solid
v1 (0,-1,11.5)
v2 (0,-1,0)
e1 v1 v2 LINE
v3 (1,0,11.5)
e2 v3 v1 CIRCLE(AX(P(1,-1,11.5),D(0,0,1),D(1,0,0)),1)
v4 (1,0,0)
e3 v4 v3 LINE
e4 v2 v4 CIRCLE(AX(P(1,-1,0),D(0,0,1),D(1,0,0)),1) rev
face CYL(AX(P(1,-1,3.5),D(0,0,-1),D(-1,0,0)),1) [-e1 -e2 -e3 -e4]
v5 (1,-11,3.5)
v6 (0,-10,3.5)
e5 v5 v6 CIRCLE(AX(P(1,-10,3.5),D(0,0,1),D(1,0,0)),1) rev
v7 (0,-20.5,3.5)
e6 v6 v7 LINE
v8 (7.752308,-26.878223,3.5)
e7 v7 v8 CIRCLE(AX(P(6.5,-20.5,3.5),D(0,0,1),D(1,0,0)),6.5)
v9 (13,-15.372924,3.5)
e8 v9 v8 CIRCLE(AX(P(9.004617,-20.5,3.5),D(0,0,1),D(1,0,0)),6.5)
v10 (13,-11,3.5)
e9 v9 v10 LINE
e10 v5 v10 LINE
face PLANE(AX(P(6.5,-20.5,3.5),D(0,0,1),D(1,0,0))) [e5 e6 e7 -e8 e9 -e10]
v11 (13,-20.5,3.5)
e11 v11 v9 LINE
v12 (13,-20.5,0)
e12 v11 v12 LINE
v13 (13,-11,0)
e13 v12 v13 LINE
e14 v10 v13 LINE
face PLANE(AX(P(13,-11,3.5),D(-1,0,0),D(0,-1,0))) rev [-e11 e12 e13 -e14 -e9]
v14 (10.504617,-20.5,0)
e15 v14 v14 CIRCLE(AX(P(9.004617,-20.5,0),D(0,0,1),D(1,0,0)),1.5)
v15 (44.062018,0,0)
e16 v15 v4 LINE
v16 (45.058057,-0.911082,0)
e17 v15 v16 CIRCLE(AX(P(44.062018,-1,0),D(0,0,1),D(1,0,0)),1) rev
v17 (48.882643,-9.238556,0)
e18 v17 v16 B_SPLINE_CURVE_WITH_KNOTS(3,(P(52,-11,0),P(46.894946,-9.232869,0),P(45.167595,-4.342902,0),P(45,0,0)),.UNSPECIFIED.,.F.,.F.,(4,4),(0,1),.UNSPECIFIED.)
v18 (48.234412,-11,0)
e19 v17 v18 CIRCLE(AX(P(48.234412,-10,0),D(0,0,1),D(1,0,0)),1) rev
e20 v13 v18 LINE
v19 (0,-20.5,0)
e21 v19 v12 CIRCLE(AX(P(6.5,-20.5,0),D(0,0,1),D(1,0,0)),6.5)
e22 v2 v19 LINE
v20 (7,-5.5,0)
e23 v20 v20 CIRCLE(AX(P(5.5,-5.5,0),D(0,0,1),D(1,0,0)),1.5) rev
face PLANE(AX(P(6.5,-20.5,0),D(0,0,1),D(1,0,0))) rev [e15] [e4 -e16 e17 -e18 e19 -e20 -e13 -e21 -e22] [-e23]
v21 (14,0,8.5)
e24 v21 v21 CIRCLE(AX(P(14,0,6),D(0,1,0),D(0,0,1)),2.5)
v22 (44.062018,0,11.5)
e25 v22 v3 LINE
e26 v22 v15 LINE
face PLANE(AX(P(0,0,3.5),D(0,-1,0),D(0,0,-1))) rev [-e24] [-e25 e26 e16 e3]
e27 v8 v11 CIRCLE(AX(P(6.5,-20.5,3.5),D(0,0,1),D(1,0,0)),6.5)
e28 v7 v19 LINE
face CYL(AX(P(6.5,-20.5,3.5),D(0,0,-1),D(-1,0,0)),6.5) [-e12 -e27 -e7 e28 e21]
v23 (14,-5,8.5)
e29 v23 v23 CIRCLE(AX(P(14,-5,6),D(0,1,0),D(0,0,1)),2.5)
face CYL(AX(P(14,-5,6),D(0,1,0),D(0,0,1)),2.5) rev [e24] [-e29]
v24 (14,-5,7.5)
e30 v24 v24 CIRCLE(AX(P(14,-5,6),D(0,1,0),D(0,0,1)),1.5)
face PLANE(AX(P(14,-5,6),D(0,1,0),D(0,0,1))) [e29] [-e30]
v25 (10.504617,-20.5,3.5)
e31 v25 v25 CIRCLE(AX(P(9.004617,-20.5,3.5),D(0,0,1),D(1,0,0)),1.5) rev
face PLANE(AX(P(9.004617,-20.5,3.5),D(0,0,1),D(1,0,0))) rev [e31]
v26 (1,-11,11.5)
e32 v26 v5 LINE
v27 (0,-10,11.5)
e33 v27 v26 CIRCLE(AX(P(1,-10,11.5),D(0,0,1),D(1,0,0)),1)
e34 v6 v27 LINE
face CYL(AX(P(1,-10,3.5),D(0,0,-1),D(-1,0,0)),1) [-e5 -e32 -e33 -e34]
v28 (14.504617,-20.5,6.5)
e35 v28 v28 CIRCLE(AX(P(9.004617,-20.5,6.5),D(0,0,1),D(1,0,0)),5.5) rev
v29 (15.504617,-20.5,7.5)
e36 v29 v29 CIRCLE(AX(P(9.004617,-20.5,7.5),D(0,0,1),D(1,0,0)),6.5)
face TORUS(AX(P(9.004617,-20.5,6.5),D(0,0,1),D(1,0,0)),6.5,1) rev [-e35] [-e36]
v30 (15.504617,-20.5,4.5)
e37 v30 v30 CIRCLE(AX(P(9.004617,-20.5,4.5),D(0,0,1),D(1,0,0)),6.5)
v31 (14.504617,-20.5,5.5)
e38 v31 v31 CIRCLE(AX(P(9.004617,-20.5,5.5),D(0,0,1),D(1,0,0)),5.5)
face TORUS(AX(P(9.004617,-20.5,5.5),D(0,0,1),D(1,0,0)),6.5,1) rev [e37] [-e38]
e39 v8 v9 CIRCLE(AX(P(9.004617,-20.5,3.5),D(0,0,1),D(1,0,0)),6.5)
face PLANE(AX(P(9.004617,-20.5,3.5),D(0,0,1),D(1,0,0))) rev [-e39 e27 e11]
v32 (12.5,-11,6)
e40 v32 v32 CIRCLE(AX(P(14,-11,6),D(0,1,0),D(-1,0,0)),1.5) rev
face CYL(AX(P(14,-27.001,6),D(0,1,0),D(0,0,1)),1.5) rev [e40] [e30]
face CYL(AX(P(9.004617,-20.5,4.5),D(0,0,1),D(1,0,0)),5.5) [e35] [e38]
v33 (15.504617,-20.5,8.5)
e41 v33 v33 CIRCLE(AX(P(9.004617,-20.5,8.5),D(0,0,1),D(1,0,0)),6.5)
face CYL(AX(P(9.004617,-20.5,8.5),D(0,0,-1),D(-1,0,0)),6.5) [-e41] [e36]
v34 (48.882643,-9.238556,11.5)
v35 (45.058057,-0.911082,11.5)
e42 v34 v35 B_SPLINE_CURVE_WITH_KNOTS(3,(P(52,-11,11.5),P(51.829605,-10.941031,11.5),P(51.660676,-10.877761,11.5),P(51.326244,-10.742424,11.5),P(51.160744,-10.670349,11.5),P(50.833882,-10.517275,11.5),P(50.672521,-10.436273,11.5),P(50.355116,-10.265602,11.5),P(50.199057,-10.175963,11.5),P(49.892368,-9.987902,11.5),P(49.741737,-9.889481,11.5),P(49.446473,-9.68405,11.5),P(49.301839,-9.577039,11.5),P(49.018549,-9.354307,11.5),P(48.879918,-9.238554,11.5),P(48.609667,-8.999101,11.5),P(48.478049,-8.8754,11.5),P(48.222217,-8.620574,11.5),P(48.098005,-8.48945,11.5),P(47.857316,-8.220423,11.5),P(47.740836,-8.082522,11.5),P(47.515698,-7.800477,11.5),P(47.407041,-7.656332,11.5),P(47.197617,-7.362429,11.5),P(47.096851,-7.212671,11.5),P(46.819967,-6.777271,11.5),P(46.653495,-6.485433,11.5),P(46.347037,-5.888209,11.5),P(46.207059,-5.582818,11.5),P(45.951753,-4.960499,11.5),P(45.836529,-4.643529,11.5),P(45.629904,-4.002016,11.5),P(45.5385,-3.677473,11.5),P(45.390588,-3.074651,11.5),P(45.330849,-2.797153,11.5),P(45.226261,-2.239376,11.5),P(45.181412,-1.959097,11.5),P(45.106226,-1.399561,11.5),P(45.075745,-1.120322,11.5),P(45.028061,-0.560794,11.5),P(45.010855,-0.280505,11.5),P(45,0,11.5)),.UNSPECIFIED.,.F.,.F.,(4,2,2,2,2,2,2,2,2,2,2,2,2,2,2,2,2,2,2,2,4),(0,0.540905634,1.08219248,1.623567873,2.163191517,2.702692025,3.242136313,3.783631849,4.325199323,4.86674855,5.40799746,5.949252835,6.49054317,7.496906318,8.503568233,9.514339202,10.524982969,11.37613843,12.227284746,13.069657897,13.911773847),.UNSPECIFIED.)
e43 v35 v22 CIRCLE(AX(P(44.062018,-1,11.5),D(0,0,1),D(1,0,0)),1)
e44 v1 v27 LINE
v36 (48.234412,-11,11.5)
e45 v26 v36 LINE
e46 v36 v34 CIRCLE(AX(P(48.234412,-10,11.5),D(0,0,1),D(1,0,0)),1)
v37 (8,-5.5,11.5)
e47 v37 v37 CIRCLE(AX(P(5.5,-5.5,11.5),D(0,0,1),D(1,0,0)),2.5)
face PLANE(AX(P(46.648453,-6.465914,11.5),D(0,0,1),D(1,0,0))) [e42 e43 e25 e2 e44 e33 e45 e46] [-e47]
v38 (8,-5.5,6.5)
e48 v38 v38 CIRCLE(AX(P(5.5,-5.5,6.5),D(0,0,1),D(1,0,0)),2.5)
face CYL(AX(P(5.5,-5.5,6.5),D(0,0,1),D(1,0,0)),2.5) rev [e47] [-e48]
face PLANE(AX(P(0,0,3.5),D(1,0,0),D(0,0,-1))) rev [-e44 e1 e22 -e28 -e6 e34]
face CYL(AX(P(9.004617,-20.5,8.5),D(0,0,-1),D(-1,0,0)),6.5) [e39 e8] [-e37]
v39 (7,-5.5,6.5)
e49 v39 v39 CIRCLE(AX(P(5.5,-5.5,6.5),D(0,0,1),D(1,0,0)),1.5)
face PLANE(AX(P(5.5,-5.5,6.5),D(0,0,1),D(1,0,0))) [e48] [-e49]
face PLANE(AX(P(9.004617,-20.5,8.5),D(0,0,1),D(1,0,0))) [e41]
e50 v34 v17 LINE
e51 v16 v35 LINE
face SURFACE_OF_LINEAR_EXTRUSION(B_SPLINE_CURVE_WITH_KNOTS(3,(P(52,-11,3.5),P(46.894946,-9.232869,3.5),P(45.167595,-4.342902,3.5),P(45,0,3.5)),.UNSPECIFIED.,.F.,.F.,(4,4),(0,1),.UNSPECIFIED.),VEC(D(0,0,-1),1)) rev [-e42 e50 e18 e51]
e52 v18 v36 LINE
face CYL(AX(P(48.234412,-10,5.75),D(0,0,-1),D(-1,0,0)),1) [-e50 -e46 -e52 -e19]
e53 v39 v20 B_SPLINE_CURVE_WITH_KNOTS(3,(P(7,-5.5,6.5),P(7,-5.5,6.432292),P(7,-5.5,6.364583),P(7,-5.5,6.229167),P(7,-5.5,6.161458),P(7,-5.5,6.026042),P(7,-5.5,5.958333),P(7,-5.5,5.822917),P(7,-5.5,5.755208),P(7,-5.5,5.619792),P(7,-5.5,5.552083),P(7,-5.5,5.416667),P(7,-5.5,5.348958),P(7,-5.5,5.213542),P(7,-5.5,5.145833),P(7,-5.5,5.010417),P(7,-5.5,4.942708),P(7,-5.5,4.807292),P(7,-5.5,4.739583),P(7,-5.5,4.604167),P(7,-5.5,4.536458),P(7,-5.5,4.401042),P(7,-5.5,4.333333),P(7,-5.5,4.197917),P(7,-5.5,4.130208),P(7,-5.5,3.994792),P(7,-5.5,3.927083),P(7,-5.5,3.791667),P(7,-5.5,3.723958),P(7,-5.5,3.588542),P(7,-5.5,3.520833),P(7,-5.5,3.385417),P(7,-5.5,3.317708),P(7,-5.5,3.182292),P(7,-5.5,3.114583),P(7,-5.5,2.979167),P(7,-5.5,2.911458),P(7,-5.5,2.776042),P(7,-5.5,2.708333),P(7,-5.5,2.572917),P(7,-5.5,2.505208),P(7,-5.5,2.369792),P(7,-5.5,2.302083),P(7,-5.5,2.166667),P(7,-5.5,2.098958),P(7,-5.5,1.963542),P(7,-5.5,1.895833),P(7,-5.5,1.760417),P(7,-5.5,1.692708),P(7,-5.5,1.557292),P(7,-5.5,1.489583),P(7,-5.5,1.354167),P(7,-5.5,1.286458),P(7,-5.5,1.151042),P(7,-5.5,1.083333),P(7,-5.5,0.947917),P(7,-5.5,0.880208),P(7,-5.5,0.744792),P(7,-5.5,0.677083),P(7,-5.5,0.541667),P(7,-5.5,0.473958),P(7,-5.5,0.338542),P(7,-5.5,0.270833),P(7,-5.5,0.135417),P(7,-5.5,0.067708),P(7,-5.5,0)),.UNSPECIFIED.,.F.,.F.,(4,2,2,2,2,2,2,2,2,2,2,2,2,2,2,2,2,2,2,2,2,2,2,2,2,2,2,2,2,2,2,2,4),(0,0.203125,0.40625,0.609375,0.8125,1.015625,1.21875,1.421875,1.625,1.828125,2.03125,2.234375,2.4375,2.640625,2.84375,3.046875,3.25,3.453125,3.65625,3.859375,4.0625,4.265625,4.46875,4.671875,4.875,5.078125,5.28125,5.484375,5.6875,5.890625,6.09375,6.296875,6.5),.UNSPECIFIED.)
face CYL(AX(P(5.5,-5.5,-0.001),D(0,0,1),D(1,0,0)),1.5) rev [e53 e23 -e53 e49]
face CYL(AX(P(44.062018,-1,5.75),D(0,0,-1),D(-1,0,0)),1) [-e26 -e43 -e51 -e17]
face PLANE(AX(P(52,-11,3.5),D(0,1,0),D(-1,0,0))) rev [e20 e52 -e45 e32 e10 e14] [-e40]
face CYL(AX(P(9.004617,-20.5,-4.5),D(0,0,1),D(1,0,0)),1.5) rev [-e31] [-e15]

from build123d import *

# Parameters (mm, degrees)
BOSS_EXTRUDE1_DEPTH = 3.5
BOSS_EXTRUDE2_DEPTH = 8
FILLET1_R           = 1
SKETCH3_R           = 1.5
CUT_EXTRUDE1_DEPTH  = 8
SKETCH4_R           = 2.5
CUT_EXTRUDE2_DEPTH  = 5
CUT_EXTRUDE3_REACH  = 58.527
SKETCH5_R           = 1.5
SKETCH6_R           = 2.5
CUT_EXTRUDE4_DEPTH  = 5
CUT_EXTRUDE5_REACH  = 57.139
SKETCH7_R           = 1.5
SKETCH8_R           = 6.5
BOSS_EXTRUDE3_DEPTH = 5
CUT_EXTRUDE6_START  = -4
SKETCH9_R           = 6.5
SKETCH9_R_2         = 5.5
CUT_EXTRUDE6_DEPTH  = 3
FILLET2_R           = 1


with BuildPart() as part:
    # Sketch1 → Boss-Extrude1 (new body)
    with BuildSketch(Plane.XY):
        with BuildLine():
            Line((0, 0), (45, 0))
            add(Edge.make_bspline(
                [(45, 0), (45.167594828, -4.342902355), (46.894946491, -9.232868563), (52, -11)],
                knots=[0, 0, 0, 0, 1, 1, 1, 1], degree=3))
            Line((52, -11), (13, -11))
            Line((13, -11), (13, -20.5))
            ThreePointArc((13, -20.5), (6.5, -27), (0, -20.5))
            Line((0, -20.5), (0, 0))
        make_face()
    extrude(amount=BOSS_EXTRUDE1_DEPTH)

    # Sketch2 → Boss-Extrude2 (add)
    with BuildSketch(Plane.XY.offset(3.5)):
        with BuildLine():
            Line((0, 0), (0, -11))
            Line((0, -11), (13, -11))
            Line((13, -11), (52, -11))
            add(Edge.make_bspline(
                [(52, -11), (46.894946491, -9.232868563), (45.167594828, -4.342902355), (45, 0)],
                knots=[0, 0, 0, 0, 1, 1, 1, 1], degree=3))
            Line((45, 0), (0, 0))
        make_face()
    extrude(amount=BOSS_EXTRUDE2_DEPTH)

    # Fillet1
    fillet1_edges = [part.edges().sort_by_distance(p)[0] for p in [
        (52, -11, 7.5),
        (45, 0, 7.5),
        (0, 0, 5.75),
        (0, -11, 7.5),
    ]]
    fillet(fillet1_edges, radius=FILLET1_R)

    # Sketch3 → Cut-Extrude1 (cut)
    with BuildSketch(Plane.XY.offset(3.5)):
        with Locations((9.004616649, -20.5)):
            Circle(SKETCH3_R)
    extrude(amount=-CUT_EXTRUDE1_DEPTH, mode=Mode.SUBTRACT)

    # Sketch4 → Cut-Extrude2 (cut)
    with BuildSketch(Plane.XY.offset(11.5)):
        with Locations((5.5, -5.5)):
            Circle(SKETCH4_R)
    extrude(amount=-CUT_EXTRUDE2_DEPTH, mode=Mode.SUBTRACT)

    # Sketch5 → Cut-Extrude3 (cut, up to next)
    with BuildSketch(Plane.XY.offset(6.5), mode=Mode.PRIVATE) as cut_extrude3_sk1:
        with Locations((5.5, -5.5)):
            Circle(SKETCH5_R)
    cut_extrude3_tool1 = extrude(cut_extrude3_sk1.sketch, amount=-CUT_EXTRUDE3_REACH, mode=Mode.PRIVATE) & part.part
    add(cut_extrude3_tool1.solids().sort_by_distance((5.5, -5.5, 6.5))[0], mode=Mode.SUBTRACT)

    # Sketch6 → Cut-Extrude4 (cut)
    with BuildSketch(Plane(origin=(0, 0, 0), x_dir=(1, 0, 0), z_dir=(0, 1, 0))):
        with Locations(Location((14, -6, 0), (0, 0, 270))):
            Circle(SKETCH6_R)
    extrude(amount=-CUT_EXTRUDE4_DEPTH, mode=Mode.SUBTRACT)

    # Sketch7 → Cut-Extrude5 (cut, up to next)
    with BuildSketch(Plane(origin=(0, -5, 0), x_dir=(1, 0, 0), z_dir=(0, 1, 0)), mode=Mode.PRIVATE) as cut_extrude5_sk1:
        with Locations(Location((14, -6, 0), (0, 0, 270))):
            Circle(SKETCH7_R)
    cut_extrude5_tool1 = extrude(cut_extrude5_sk1.sketch, amount=-CUT_EXTRUDE5_REACH, mode=Mode.PRIVATE) & part.part
    add(cut_extrude5_tool1.solids().sort_by_distance((14, -5, 6))[0], mode=Mode.SUBTRACT)

    # Sketch8 → Boss-Extrude3 (add)
    with BuildSketch(Plane.XY.offset(3.5)):
        with Locations(Location((9.004616649, -20.5, 0), (0, 0, 258.891775774))):
            Circle(SKETCH8_R)
    extrude(amount=BOSS_EXTRUDE3_DEPTH)

    # Sketch9 → Cut-Extrude6 (cut)
    with BuildSketch(Plane.XY.offset(8.5).offset(CUT_EXTRUDE6_START)):
        with Locations(Location((9.004616649, -20.5, 0), (0, 0, 258.891775774))):
            Circle(SKETCH9_R)
        with Locations((9.004616649, -20.5)):
            Circle(SKETCH9_R_2, mode=Mode.SUBTRACT)
    extrude(amount=CUT_EXTRUDE6_DEPTH, mode=Mode.SUBTRACT)

    # Fillet2
    fillet2_edges = [part.edges().sort_by_distance(p)[0] for p in [
        (3.504616649, -20.5, 4.5),
        (3.504616649, -20.5, 7.5),
    ]]
    fillet(fillet2_edges, radius=FILLET2_R - 0.0001)  # a hair under: the kernel refuses the full size


solid = part.part
